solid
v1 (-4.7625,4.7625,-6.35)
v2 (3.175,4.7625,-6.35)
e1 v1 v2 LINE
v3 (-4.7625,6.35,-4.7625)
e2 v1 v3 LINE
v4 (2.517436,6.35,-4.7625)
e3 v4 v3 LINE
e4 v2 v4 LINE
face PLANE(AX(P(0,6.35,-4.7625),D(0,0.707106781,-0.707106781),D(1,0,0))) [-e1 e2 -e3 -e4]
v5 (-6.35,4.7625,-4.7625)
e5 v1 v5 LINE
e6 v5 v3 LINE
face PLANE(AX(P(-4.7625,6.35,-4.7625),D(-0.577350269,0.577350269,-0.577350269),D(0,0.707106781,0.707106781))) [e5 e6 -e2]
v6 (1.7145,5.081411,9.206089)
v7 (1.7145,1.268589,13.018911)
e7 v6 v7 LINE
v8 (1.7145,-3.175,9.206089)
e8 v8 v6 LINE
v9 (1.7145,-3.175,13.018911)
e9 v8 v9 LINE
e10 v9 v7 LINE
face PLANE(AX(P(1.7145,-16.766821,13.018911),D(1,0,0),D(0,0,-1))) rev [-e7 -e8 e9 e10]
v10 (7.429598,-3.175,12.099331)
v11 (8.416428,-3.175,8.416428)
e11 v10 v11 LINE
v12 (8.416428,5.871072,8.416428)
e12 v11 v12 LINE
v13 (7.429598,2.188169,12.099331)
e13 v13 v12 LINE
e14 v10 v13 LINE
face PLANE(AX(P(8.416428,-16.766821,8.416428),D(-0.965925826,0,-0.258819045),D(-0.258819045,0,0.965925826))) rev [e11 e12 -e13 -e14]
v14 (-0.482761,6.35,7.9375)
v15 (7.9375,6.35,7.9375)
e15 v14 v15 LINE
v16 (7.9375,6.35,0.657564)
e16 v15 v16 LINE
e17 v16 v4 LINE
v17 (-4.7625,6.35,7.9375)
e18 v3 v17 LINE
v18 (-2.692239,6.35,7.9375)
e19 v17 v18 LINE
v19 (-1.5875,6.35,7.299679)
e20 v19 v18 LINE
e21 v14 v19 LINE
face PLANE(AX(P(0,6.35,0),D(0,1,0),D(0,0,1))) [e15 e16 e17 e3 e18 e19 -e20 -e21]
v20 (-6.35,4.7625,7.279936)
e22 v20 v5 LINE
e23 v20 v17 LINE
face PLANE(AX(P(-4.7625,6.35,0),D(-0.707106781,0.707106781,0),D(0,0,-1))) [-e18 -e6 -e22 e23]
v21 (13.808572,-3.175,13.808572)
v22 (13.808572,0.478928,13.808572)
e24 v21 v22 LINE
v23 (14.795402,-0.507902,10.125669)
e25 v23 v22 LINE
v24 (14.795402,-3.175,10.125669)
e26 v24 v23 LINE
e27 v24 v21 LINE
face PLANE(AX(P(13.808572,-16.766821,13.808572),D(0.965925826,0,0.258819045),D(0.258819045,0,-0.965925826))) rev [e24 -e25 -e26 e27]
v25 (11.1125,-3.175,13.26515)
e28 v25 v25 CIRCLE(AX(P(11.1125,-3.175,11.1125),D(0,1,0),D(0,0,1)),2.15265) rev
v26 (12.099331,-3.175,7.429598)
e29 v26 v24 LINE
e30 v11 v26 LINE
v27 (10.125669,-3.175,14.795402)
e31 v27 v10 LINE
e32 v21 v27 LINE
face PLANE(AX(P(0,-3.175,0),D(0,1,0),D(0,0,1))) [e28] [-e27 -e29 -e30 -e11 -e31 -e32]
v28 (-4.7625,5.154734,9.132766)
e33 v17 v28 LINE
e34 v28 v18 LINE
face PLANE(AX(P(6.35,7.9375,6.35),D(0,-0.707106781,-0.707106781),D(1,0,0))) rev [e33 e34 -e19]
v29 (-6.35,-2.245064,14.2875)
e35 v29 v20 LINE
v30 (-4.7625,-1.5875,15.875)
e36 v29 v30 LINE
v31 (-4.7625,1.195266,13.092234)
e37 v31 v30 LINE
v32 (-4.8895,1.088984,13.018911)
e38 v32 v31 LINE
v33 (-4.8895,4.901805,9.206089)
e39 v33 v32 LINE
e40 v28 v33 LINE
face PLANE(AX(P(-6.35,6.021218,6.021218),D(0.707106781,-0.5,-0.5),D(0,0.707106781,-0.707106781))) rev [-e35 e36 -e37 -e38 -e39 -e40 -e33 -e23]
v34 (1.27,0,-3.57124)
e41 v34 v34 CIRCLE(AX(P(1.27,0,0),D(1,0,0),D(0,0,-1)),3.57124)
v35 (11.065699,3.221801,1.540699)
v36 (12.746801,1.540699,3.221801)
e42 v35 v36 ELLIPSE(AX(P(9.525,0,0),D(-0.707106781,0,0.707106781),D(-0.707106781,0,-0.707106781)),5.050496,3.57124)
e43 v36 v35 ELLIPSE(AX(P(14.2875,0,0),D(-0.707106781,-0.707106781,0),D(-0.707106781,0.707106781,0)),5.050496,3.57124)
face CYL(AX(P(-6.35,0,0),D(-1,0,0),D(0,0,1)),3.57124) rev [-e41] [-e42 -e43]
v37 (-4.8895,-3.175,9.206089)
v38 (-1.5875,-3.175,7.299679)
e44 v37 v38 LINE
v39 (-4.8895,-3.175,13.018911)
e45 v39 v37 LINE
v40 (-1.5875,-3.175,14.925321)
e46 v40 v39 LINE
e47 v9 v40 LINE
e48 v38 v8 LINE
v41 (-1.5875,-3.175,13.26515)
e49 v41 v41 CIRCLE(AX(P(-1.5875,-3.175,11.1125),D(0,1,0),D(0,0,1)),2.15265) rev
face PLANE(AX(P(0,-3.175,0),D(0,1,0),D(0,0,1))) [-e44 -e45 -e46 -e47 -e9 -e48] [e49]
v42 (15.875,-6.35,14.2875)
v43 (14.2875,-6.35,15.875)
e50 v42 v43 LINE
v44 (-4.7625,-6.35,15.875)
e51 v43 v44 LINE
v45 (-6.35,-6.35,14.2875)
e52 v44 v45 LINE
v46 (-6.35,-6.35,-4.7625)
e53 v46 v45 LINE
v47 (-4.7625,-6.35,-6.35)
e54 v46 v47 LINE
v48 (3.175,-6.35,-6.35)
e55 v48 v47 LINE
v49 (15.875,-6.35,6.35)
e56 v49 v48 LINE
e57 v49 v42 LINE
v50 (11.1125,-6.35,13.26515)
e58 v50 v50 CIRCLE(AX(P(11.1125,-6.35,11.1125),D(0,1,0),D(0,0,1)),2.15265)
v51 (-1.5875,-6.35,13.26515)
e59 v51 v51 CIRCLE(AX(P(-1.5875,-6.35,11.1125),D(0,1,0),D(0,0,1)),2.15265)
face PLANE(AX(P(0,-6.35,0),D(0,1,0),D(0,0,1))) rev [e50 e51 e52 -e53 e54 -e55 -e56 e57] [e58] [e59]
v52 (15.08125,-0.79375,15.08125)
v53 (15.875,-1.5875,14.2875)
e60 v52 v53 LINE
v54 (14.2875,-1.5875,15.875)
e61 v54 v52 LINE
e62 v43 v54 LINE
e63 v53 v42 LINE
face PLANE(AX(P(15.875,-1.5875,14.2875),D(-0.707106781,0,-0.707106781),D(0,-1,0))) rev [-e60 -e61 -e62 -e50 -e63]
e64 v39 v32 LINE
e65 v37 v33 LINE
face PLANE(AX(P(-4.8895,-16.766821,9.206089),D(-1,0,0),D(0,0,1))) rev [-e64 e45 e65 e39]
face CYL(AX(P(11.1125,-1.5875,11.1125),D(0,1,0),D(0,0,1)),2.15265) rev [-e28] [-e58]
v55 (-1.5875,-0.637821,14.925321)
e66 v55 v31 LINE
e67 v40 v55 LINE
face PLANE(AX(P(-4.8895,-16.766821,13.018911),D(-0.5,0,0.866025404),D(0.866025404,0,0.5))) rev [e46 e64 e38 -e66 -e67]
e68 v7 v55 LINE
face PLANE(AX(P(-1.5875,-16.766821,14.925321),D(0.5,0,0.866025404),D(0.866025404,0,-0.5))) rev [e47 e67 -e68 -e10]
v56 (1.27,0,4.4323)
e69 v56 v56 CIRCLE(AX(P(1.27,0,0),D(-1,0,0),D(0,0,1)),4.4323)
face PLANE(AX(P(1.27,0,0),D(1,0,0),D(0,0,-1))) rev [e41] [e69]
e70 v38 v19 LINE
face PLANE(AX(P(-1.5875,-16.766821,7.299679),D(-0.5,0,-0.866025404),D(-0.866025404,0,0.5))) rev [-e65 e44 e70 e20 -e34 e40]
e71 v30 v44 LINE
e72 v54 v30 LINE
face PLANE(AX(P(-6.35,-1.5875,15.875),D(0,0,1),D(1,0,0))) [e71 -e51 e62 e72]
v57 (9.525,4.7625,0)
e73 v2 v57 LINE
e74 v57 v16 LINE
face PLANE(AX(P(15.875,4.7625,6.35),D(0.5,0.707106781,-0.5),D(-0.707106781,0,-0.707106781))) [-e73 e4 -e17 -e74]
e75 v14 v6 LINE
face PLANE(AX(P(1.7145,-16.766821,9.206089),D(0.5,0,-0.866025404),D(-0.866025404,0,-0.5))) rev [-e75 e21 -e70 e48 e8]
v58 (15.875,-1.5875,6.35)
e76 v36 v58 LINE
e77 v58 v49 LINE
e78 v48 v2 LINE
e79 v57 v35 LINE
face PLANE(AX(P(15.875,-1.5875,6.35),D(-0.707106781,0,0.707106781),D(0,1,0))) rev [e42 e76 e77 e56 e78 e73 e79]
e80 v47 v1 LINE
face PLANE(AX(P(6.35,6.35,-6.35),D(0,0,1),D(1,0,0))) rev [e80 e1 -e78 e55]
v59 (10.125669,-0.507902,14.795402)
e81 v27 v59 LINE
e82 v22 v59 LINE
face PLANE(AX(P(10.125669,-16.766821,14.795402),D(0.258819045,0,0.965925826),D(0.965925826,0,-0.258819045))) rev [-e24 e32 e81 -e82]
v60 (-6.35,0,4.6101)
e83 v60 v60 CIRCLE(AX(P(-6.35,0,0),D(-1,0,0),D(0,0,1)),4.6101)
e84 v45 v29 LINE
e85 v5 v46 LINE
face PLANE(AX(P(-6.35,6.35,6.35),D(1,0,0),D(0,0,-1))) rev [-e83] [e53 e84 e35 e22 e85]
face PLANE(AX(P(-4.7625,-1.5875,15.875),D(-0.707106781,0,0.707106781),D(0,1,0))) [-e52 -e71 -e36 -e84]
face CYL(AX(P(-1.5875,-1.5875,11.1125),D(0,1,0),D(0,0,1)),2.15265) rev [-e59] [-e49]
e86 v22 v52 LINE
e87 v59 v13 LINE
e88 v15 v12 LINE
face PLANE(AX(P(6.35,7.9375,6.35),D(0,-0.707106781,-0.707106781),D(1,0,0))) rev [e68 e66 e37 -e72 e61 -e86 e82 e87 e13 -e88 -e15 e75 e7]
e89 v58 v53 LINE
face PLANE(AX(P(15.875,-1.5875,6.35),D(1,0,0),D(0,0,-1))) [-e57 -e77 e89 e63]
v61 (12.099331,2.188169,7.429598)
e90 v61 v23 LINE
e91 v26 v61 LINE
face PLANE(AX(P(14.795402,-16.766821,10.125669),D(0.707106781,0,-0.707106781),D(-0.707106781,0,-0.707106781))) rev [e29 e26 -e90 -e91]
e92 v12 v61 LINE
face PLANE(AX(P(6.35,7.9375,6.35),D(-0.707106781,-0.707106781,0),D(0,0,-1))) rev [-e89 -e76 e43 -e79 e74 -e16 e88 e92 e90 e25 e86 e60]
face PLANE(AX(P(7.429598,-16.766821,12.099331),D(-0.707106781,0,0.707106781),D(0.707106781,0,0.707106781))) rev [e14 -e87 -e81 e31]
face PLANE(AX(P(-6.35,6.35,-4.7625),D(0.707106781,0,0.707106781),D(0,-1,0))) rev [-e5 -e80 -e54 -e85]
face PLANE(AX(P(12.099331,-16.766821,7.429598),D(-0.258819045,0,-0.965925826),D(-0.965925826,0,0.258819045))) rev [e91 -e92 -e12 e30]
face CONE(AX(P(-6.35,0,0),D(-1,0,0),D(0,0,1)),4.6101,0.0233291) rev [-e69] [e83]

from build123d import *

# Parameters (mm, degrees)
SKETCH1_W               = 12.7
SKETCH1_H               = 12.7
BOSS_EXTRUDE1_DEPTH     = 6.35
SKETCH2_W               = 22.225
SKETCH2_H               = 9.525
BOSS_EXTRUDE2_DEPTH     = 4.7625
CHAMFER1_START          = -6.35
CHAMFER1_DEPTH          = 12.7
CUT_EXTRUDE1_DEPTH      = 7.9375
F_6_CLEARANCE_HOLE1_D   = 4.3053
CHAMFER3_SIZE           = 9.525
F_1_4_CLEARANCE_HOLE1_D = 7.14248
CUT_EXTRUDE2_DEPTH      = 9.525
CUT_EXTRUDE3_DEPTH      = 26.793821935


with BuildPart() as part:
    # Sketch1 → Boss-Extrude1 (new, symmetric)
    with BuildSketch(Plane(origin=(0, 0, 0), x_dir=(1, 0, 0), z_dir=(0, 1, 0))):
        Rectangle(SKETCH1_W, SKETCH1_H)
    extrude(amount=BOSS_EXTRUDE1_DEPTH, both=True)

    # Sketch2 → Boss-Extrude2 (add)
    with BuildSketch(Plane.XZ.offset(6.35)):
        with Locations((4.7625, 11.1125)):
            Rectangle(SKETCH2_W, SKETCH2_H)
    extrude(amount=-BOSS_EXTRUDE2_DEPTH)

    # Chamfer1: read off the stored shape, not the designer's step
    # Chamfer1 outline → Chamfer1 (add)
    with BuildSketch(Plane(origin=(0, 0, 0), x_dir=(1, 0, 0), z_dir=(0, 1, 0)).offset(CHAMFER1_START)):
        Polygon((15.875, -6.35), (6.35, 3.175), (6.35, -6.35), align=None)
    extrude(amount=CHAMFER1_DEPTH)

    # Sketch3 → Cut-Extrude1 (cut)
    with BuildSketch(Plane(origin=(0, 6.35, 0), x_dir=(1, 0, 0), z_dir=(0, 1, 0))):
        Polygon((6.35, 3.175), (6.35, -6.35), (15.875, -6.35), align=None)
    extrude(amount=-CUT_EXTRUDE1_DEPTH, mode=Mode.SUBTRACT)

    # #6 Clearance Hole1 (through all)
    with Locations(Plane(origin=(0, -1.5875, 0), x_dir=(1, 0, 0), z_dir=(0, 1, 0))):
        with Locations((-1.5875, -11.1125), (11.1125, -11.1125)):
            Hole(F_6_CLEARANCE_HOLE1_D / 2)

    # Chamfer3
    # the kernel refuses this chamfer: 9.525 mm, written as the material it adds along each edge
    with BuildSketch(Plane(origin=(6.35, -1.5875, -27.67028046), x_dir=(1, 0, 0), z_dir=(0, 0, 1))) as chamfer3_piece_1_section:
        Polygon((CHAMFER3_SIZE, 0), (0, CHAMFER3_SIZE), (0, 0), align=None)
    chamfer3_piece_1 = extrude(amount=34.02028046, mode=Mode.PRIVATE)
    chamfer3_piece_1 = split(chamfer3_piece_1, bisect_by=Plane(origin=(6.35, 6.35, -27.67028046), z_dir=(0, -1, 0)), keep=Keep.TOP, mode=Mode.PRIVATE)
    chamfer3_piece_1 = split(chamfer3_piece_1, bisect_by=Plane(origin=(-5.89764023, -1.5875, -15.42264023), z_dir=(-0.7071067811865475, 0, 0.7071067811865476)), keep=Keep.TOP, mode=Mode.PRIVATE)
    add(chamfer3_piece_1)
    with BuildSketch(Plane(origin=(-6.35, -1.5875, 6.35), x_dir=(0, 1, 0), z_dir=(1, 0, 0))) as chamfer3_piece_2_section:
        Polygon((CHAMFER3_SIZE, 0), (0, CHAMFER3_SIZE), (0, 0), align=None)
    chamfer3_piece_2 = extrude(amount=12.7, mode=Mode.PRIVATE)
    chamfer3_piece_2 = split(chamfer3_piece_2, bisect_by=Plane(origin=(-6.35, 6.35, 6.35), z_dir=(0, -1, 0)), keep=Keep.TOP, mode=Mode.PRIVATE)
    chamfer3_piece_2 = chamfer3_piece_2 - Plane(origin=(-1.5875, -1.5875, 11.1125), x_dir=(-1, 0, 0), z_dir=(0, -1, 0)) * Cylinder(2.15265, 64, mode=Mode.PRIVATE)
    add(chamfer3_piece_2)
    with BuildSketch(Plane(origin=(-6.35, -1.5875, 6.35), x_dir=(0, 1, 0), z_dir=(1, 0, 0))) as chamfer3_piece_3a_section:
        Polygon((CHAMFER3_SIZE, 0), (0, CHAMFER3_SIZE), (0, 0), align=None)
    chamfer3_piece_3a = extrude(amount=37.19528046, mode=Mode.PRIVATE)
    chamfer3_piece_3a = split(chamfer3_piece_3a, bisect_by=Plane(origin=(-6.35, 6.35, 6.35), z_dir=(0, -1, 0)), keep=Keep.TOP, mode=Mode.PRIVATE)
    chamfer3_piece_3a = split(chamfer3_piece_3a, bisect_by=Plane(origin=(6.35, -1.5875, 6.35), z_dir=(1, 0, 0)), keep=Keep.TOP, mode=Mode.PRIVATE)
    chamfer3_piece_3a = split(chamfer3_piece_3a, bisect_by=Plane(origin=(15.875, -1.5875, 6.35), z_dir=(-1, 0, 0)), keep=Keep.TOP, mode=Mode.PRIVATE)
    chamfer3_piece_3a = chamfer3_piece_3a - Plane(origin=(11.1125, -1.5875, 11.1125), x_dir=(-1, 0, 0), z_dir=(0, -1, 0)) * Cylinder(2.15265, 113, mode=Mode.PRIVATE)
    with BuildSketch(Plane(origin=(6.35, -1.5875, -27.67028046), x_dir=(1, 0, 0), z_dir=(0, 0, 1))) as chamfer3_piece_3b_section:
        Polygon((CHAMFER3_SIZE, 0), (0, CHAMFER3_SIZE), (0, 0), align=None)
    chamfer3_piece_3b = extrude(amount=58.515560921, mode=Mode.PRIVATE)
    chamfer3_piece_3b = split(chamfer3_piece_3b, bisect_by=Plane(origin=(6.35, -1.5875, 6.35), z_dir=(0, 0, 1)), keep=Keep.TOP, mode=Mode.PRIVATE)
    chamfer3_piece_3b = split(chamfer3_piece_3b, bisect_by=Plane(origin=(6.35, 6.35, -27.67028046), z_dir=(0, -1, 0)), keep=Keep.TOP, mode=Mode.PRIVATE)
    chamfer3_piece_3b = split(chamfer3_piece_3b, bisect_by=Plane(origin=(6.35, -1.5875, 15.875), z_dir=(0, 0, -1)), keep=Keep.TOP, mode=Mode.PRIVATE)
    chamfer3_piece_3b = chamfer3_piece_3b - Plane(origin=(11.1125, -1.5875, 11.1125), x_dir=(-1, 0, 0), z_dir=(0, -1, 0)) * Cylinder(2.15265, 156, mode=Mode.PRIVATE)
    chamfer3_piece_3 = chamfer3_piece_3a & chamfer3_piece_3b
    add(chamfer3_piece_3)

    # Sketch9 → Hole1 (revolve, cut)
    with BuildSketch(Plane(origin=(-6.35, 0, 0), x_dir=(0, 0, 1), z_dir=(0, 1, 0))):
        Polygon((0, 0), (0, 7.62), (4.4323, 7.62), (4.6101, 0), align=None)
    revolve(axis=Axis((103.65, 0, 0), (-1, 0, 0)), mode=Mode.SUBTRACT)

    # 1/4 Clearance Hole1 (through all)
    with Locations(Plane.ZY.offset(6.35)):
        with Locations((0, 0)):
            Hole(F_1_4_CLEARANCE_HOLE1_D / 2)

    # Sketch12 → Cut-Extrude2 (cut)
    with BuildSketch(Plane(origin=(0, 6.35, 0), x_dir=(1, 0, 0), z_dir=(0, 1, 0))):
        Polygon((-4.8895, -9.206089411), (-4.8895, -13.018910589), (-1.5875, -14.925321178), (1.7145, -13.018910589), (1.7145, -9.206089411), (-1.5875, -7.299678822), align=None)
        Polygon((8.41642829, -8.41642829), (7.429597553, -12.099330736), (10.125669264, -14.795402447), (13.80857171, -13.80857171), (14.795402447, -10.125669264), (12.099330736, -7.429597553), align=None)
    extrude(amount=-CUT_EXTRUDE2_DEPTH, mode=Mode.SUBTRACT)

    # Sketch15 → Cut-Extrude3 (cut, through all)
    with BuildSketch(Plane(origin=(0, 6.35, 0), x_dir=(1, 0, 0), z_dir=(0, 1, 0))):
        Polygon((6.35, 3.175), (3.175, 6.35), (6.35, 6.35), align=None)
    extrude(amount=-CUT_EXTRUDE3_DEPTH, mode=Mode.SUBTRACT)

    # Chamfer4
    # the kernel refuses this chamfer: 1.5875 mm, written as the material it takes off along each edge
    with BuildSketch(Plane(origin=(-5.291666667, 5.291666667, -5.291666667), x_dir=(0.7071067811865476, 0.7071067811865476, 0), z_dir=(-0.5773502691896257, 0.577350269189626, -0.5773502691896257))) as chamfer4_piece_1:
        Polygon((-1.122532015, -0.648094161), (1.122532015, -0.648094161), (0, 1.296188322), align=None)
    extrude(amount=2.016395815, mode=Mode.SUBTRACT)
    with BuildSketch(Plane(origin=(15.875, -10.432546743, 15.875), x_dir=(0, 0, -1), z_dir=(0, 1, 0))) as chamfer4_piece_2:
        with BuildLine():
            Line((1.632401281, -0.044901281), (-0.044901281, 1.632401281))
            Line((-0.044901281, 1.632401281), (-0.076651281, 1.632401281))
            ThreePointArc((-0.076651281, 1.632401281), (-0.03175, 0.81620064), (-0.03175, 0))
            Line((-0.03175, 0), (0, -0.03175))
            ThreePointArc((0, -0.03175), (0.81620064, -0.03175), (1.632401281, -0.076651281))
            Line((1.632401281, -0.076651281), (1.632401281, -0.044901281))
        make_face()
    extrude(amount=12.927593487, mode=Mode.SUBTRACT)
    with BuildSketch(Plane(origin=(-10.432546743, 6.35, -6.35), x_dir=(0, -1, 0), z_dir=(1, 0, 0))) as chamfer4_piece_3:
        with BuildLine():
            Line((1.632401281, 0.044901281), (-0.044901281, -1.632401281))
            Line((-0.044901281, -1.632401281), (-0.076651281, -1.632401281))
            ThreePointArc((-0.076651281, -1.632401281), (-0.03175, -0.81620064), (-0.03175, 0))
            Line((-0.03175, 0), (0, 0.03175))
            ThreePointArc((0, 0.03175), (0.81620064, 0.03175), (1.632401281, 0.076651281))
            Line((1.632401281, 0.076651281), (1.632401281, 0.044901281))
        make_face()
    extrude(amount=17.690093487, mode=Mode.SUBTRACT)
    with BuildSketch(Plane(origin=(-6.35, -10.432546743, 15.875), x_dir=(0, 0, -1), z_dir=(0, 1, 0))) as chamfer4_piece_4:
        with BuildLine():
            Line((1.632401281, 0.044901281), (-0.044901281, -1.632401281))
            Line((-0.044901281, -1.632401281), (-0.076651281, -1.632401281))
            ThreePointArc((-0.076651281, -1.632401281), (-0.03175, -0.81620064), (-0.03175, 0))
            Line((-0.03175, 0), (0, 0.03175))
            ThreePointArc((0, 0.03175), (0.81620064, 0.03175), (1.632401281, 0.076651281))
            Line((1.632401281, 0.076651281), (1.632401281, 0.044901281))
        make_face()
    extrude(amount=12.927593487, mode=Mode.SUBTRACT)
    with BuildSketch(Plane(origin=(-6.35, 9.236796487, 5.050703513), x_dir=(1, 0, 0), z_dir=(0, -0.7071067811865476, 0.7071067811865476))) as chamfer4_piece_5:
        with BuildLine():
            Line((1.632401281, 0.044901281), (-0.044901281, -1.632401281))
            Line((-0.044901281, -1.632401281), (-0.076651281, -1.632401281))
            ThreePointArc((-0.076651281, -1.632401281), (-0.03175, -0.81620064), (-0.03175, 0))
            Line((-0.03175, 0), (0, 0.03175))
            ThreePointArc((0, 0.03175), (0.81620064, 0.03175), (1.632401281, 0.076651281))
            Line((1.632401281, 0.076651281), (1.632401281, 0.044901281))
        make_face()
    extrude(amount=19.390413638, mode=Mode.SUBTRACT)
    with BuildSketch(Plane(origin=(-6.35, 6.35, 12.020046743), x_dir=(0, -1, 0), z_dir=(0, 0, -1))) as chamfer4_piece_6:
        with BuildLine():
            Line((1.632401281, 0.044901281), (-0.044901281, -1.632401281))
            Line((-0.044901281, -1.632401281), (-0.076651281, -1.632401281))
            ThreePointArc((-0.076651281, -1.632401281), (-0.03175, -0.81620064), (-0.03175, 0))
            Line((-0.03175, 0), (0, 0.03175))
            ThreePointArc((0, 0.03175), (0.81620064, 0.03175), (1.632401281, 0.076651281))
            Line((1.632401281, 0.076651281), (1.632401281, 0.044901281))
        make_face()
    extrude(amount=22.452593487, mode=Mode.SUBTRACT)
    with BuildSketch(Plane(origin=(-6.35, 10.432546743, -6.35), x_dir=(0, 0, 1), z_dir=(0, -1, 0))) as chamfer4_piece_7:
        with BuildLine():
            Line((1.632401281, 0.044901281), (-0.044901281, -1.632401281))
            Line((-0.044901281, -1.632401281), (-0.076651281, -1.632401281))
            ThreePointArc((-0.076651281, -1.632401281), (-0.03175, -0.81620064), (-0.03175, 0))
            Line((-0.03175, 0), (0, 0.03175))
            ThreePointArc((0, 0.03175), (0.81620064, 0.03175), (1.632401281, 0.076651281))
            Line((1.632401281, 0.076651281), (1.632401281, 0.044901281))
        make_face()
    extrude(amount=20.865093487, mode=Mode.SUBTRACT)
    with BuildSketch(Plane(origin=(10.824296487, 6.35, 1.299296487), x_dir=(0, -1, 0), z_dir=(-0.7071067811865507, 0, -0.7071067811865444))) as chamfer4_piece_8:
        with BuildLine():
            Line((1.632401281, -0.044901281), (-0.044901281, 1.632401281))
            Line((-0.044901281, 1.632401281), (-0.076651281, 1.632401281))
            ThreePointArc((-0.076651281, 1.632401281), (-0.03175, 0.81620064), (-0.03175, 0))
            Line((-0.03175, 0), (0, -0.03175))
            ThreePointArc((0, -0.03175), (0.81620064, -0.03175), (1.632401281, -0.076651281))
            Line((1.632401281, -0.076651281), (1.632401281, -0.044901281))
        make_face()
    extrude(amount=14.900285578, mode=Mode.SUBTRACT)


solid = part.part
